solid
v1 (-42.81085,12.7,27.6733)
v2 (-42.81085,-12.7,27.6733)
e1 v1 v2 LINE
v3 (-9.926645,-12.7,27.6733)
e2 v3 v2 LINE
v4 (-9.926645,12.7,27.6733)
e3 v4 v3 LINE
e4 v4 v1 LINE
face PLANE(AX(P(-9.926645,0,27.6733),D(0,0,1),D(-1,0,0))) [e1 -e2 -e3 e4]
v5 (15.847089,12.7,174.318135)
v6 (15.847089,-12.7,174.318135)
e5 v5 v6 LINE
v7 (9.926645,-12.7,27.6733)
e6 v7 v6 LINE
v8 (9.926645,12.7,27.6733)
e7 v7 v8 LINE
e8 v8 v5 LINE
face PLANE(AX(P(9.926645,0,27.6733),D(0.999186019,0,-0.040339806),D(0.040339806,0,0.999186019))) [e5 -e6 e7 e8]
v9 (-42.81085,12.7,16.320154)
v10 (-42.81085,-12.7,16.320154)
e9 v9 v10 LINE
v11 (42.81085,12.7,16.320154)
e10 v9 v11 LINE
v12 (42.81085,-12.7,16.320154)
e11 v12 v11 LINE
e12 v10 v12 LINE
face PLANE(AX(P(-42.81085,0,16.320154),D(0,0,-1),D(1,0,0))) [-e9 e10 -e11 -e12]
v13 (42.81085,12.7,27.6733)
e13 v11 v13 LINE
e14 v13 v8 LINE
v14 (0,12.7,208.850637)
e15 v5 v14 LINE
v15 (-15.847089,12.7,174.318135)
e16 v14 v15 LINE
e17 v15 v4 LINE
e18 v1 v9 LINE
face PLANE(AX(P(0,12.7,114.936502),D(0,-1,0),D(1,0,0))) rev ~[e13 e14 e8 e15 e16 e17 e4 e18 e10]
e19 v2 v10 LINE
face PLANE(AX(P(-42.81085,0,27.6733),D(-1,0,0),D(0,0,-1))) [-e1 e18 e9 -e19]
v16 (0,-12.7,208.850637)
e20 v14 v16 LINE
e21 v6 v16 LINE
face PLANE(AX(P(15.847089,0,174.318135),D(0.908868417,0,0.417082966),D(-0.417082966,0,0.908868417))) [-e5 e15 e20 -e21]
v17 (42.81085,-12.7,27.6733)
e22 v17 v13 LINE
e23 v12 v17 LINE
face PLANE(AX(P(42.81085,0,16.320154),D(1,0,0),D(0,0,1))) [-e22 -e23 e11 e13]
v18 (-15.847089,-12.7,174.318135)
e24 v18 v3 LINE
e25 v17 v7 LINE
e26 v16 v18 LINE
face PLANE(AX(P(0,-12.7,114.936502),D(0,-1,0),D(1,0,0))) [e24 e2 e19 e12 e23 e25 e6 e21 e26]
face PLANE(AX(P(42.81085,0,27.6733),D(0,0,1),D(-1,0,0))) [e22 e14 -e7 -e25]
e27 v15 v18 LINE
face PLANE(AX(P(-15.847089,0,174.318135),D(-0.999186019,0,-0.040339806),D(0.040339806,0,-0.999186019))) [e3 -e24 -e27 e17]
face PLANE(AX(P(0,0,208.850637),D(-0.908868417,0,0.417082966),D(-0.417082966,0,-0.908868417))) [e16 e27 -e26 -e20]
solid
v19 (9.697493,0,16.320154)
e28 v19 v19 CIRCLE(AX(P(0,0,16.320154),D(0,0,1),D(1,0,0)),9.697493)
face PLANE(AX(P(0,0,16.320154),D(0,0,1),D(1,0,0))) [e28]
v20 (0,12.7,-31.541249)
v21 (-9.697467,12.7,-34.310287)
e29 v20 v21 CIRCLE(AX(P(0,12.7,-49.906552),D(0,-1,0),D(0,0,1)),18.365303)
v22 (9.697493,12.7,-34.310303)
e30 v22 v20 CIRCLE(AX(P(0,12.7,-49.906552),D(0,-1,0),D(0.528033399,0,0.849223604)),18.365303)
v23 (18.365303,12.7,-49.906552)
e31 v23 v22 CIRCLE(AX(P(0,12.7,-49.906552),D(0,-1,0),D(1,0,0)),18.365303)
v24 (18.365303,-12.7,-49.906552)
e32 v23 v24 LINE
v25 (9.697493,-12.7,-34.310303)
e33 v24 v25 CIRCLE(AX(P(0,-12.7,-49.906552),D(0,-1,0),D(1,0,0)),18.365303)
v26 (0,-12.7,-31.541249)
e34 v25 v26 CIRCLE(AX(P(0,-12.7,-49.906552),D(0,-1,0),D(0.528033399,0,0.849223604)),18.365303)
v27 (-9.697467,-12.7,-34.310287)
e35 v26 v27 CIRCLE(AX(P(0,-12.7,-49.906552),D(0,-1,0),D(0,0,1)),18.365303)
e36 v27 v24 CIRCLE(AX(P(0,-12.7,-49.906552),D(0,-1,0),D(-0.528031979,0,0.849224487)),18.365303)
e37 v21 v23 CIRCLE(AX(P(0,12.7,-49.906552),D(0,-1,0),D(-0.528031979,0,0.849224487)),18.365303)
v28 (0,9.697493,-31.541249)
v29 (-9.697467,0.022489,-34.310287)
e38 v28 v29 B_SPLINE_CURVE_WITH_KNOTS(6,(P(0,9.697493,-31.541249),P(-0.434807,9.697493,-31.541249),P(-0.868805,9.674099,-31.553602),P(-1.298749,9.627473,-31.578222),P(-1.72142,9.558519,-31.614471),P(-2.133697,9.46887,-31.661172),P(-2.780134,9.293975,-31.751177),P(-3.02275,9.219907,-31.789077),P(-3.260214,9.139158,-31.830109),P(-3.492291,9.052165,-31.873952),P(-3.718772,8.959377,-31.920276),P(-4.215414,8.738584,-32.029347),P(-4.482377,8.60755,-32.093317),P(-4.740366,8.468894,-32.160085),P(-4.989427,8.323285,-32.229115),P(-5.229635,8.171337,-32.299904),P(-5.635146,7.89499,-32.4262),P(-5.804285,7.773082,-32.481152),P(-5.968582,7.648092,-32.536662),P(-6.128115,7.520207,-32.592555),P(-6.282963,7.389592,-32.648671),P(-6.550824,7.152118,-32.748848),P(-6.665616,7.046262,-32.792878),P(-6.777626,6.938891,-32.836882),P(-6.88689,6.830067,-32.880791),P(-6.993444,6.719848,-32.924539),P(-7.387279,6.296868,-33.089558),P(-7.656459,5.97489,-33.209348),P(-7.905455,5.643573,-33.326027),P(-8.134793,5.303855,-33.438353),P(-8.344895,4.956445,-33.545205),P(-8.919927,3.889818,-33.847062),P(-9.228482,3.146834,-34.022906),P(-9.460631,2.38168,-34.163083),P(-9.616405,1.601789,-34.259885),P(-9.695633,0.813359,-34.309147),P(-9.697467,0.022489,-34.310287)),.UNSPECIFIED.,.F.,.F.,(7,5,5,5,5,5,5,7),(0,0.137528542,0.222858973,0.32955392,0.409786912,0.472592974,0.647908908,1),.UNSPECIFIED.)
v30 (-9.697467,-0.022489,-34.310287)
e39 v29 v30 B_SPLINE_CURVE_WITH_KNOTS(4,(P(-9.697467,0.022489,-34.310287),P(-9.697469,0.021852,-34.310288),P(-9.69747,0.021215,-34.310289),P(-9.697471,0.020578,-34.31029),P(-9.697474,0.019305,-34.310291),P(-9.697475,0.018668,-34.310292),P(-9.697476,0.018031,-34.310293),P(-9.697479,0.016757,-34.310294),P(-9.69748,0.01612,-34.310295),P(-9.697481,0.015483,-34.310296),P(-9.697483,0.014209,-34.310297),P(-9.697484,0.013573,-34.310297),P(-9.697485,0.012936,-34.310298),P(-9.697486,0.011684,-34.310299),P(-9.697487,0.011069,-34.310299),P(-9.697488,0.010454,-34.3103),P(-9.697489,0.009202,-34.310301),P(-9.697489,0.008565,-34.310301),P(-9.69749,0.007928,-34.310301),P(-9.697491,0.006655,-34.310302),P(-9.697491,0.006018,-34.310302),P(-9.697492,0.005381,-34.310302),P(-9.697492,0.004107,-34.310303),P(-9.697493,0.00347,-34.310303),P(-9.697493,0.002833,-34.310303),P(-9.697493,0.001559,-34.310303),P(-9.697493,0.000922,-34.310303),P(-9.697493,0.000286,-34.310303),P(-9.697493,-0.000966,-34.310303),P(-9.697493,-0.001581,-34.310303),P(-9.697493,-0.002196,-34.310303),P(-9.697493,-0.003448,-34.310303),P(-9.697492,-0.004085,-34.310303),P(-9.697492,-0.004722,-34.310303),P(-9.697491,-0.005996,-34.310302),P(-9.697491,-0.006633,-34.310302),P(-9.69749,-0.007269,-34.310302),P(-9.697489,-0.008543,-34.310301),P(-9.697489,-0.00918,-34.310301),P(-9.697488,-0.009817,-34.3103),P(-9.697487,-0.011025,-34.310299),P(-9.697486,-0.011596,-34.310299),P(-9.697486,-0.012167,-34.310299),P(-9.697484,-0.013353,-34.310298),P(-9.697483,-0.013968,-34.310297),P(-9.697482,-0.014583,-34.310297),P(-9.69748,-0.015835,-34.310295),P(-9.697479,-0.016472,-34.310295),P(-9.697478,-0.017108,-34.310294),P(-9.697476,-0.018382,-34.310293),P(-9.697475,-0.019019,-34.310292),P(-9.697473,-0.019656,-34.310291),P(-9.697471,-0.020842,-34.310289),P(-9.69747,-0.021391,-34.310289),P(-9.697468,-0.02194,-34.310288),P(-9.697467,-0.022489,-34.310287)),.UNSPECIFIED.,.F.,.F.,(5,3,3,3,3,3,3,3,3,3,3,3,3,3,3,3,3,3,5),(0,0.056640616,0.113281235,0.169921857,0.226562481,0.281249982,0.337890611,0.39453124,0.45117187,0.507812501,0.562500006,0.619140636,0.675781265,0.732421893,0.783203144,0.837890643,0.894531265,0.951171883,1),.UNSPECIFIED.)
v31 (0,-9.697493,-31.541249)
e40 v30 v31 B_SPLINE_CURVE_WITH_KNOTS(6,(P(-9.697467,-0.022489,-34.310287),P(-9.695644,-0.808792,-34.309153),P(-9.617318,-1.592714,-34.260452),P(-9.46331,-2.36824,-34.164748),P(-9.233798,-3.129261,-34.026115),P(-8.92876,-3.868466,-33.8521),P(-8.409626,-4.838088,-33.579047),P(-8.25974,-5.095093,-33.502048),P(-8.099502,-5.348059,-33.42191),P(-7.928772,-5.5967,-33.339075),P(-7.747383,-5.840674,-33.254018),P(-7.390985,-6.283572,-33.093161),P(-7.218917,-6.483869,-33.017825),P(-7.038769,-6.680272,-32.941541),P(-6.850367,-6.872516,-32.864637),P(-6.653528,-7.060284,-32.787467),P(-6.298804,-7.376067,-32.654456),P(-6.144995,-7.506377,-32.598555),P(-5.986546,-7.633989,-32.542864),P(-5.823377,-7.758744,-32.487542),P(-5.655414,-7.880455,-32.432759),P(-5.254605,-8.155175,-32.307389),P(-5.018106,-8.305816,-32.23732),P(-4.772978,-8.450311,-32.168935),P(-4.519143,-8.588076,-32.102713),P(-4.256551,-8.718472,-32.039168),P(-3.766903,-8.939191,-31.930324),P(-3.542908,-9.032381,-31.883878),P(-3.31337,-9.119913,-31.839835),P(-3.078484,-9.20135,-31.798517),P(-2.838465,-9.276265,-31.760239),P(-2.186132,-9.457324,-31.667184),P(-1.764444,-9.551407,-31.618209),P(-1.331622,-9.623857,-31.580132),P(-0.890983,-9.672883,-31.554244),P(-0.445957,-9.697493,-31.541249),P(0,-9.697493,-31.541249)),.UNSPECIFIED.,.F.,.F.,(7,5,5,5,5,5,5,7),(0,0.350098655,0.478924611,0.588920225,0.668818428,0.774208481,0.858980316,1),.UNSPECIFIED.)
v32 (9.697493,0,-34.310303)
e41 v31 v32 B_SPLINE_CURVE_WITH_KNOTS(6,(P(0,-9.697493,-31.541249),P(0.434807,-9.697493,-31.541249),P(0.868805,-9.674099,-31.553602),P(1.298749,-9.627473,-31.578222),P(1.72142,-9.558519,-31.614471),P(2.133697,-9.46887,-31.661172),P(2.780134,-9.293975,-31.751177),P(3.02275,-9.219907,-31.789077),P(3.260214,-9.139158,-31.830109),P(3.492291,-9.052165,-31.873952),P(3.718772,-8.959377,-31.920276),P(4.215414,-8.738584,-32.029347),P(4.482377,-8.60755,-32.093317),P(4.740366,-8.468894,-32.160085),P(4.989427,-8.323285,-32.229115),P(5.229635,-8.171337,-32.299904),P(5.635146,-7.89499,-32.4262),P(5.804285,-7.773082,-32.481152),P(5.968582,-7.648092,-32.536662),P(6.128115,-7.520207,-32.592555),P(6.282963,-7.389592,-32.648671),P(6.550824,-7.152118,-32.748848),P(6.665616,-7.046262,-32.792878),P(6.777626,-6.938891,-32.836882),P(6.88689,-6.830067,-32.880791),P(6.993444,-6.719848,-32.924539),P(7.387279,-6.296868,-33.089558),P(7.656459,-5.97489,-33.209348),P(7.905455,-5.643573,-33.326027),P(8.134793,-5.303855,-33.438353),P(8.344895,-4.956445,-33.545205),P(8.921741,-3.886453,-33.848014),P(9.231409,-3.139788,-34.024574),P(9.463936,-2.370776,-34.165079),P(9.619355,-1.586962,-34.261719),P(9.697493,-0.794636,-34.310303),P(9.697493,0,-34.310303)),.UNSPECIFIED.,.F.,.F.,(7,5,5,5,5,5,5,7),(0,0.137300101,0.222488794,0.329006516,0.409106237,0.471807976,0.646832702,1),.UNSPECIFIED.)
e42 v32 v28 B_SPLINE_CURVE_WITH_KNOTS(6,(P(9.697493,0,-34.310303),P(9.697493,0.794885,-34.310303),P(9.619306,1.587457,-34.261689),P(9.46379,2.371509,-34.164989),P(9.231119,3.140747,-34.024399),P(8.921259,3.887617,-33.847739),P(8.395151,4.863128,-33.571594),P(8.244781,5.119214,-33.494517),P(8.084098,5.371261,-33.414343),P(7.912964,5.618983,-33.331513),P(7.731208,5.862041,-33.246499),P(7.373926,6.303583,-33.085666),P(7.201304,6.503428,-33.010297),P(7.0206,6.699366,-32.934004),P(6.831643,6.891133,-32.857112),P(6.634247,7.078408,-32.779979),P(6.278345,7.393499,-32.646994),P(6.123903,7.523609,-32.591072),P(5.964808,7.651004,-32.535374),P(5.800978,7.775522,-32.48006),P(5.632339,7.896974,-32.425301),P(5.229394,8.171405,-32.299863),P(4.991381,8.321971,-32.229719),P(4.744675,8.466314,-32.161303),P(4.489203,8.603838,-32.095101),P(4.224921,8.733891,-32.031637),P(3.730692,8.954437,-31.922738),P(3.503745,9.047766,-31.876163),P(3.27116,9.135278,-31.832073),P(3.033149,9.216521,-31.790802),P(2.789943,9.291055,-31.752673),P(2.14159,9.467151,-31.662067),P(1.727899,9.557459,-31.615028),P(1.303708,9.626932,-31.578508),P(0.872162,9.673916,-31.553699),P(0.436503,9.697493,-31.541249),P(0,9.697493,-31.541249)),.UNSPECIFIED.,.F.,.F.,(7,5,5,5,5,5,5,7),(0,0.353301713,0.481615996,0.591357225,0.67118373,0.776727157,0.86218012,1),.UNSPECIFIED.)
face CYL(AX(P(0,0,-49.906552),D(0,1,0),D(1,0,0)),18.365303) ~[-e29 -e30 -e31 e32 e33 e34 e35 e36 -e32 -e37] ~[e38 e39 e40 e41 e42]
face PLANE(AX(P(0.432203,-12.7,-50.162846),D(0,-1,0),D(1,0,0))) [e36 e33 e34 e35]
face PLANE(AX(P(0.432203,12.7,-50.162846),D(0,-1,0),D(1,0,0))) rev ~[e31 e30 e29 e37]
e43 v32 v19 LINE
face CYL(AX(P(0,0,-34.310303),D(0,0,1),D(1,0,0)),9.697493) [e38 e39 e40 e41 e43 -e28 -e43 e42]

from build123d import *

# Parameters (mm, degrees)
F0_W     = 9.6974931657
F0_H     = 5.6765731424
F0_W_2   = 9.6974670887
F1_DEPTH = 12.7
F3_DEPTH = 12.7


# Not quite as in the source:
# - ends of sketch curves that miss each other by under 0.0002 mm in the source are joined


with BuildPart() as f1:
    # F0 (on Front) → F1 (new body, symmetric)
    with BuildSketch(Plane.XZ):
        Polygon((-9.9266454939, 27.6733003557), (9.9266454939, 27.6733003557), (15.8470887691, 174.3181347847), (0, 208.8506370783), (-15.8470887691, 174.3181347847), align=None)
        Polygon((9.6974931657, 21.9967272133), (9.6974931657, 16.3201540709), (42.8108498454, 16.3201540709), (42.8108498454, 27.6733003557), (9.9266454939, 27.6733003557), align=None)
        Polygon((-42.8108498454, 16.3201540709), (-9.6974670887, 16.3201540709), (-9.6974670887, 21.9967272133), (-9.9266454939, 27.6733003557), (-42.8108498454, 27.6733003557), align=None)
        Polygon((0, 21.9967272133), (9.6974931657, 21.9967272133), (9.9266454939, 27.6733003557), (-9.9266454939, 27.6733003557), (-9.6974670887, 21.9967272133), align=None)
        with Locations((4.8487465829, 19.1584406421)):
            Rectangle(F0_W, F0_H)
        with Locations((-4.8487335443, 19.1584406421)):
            Rectangle(F0_W_2, F0_H)
    extrude(amount=F1_DEPTH, both=True)


with BuildPart() as f2:
    # F0 (on Front) → F2 (revolve)
    with BuildSketch(Plane.XZ):
        with BuildLine():
            ThreePointArc((0, -31.5412492268), (5.0425448571, -32.2470761559), (9.6974931657, -34.3103033691))
            Line((9.6974931657, -34.3103033691), (9.6974931657, 16.3201540709))
            Line((9.6974931657, 16.3201540709), (0, 16.3201540709))
            Line((0, 16.3201540709), (0, -31.5412492268))
        make_face()
    revolve(axis=Axis((0, 0, -14.901005663), (0, 0, 1)))

    # F0 (on Front) → F3 (join, symmetric)
    with BuildSketch(Plane.XZ):
        with BuildLine():
            ThreePointArc((-9.6974670887, -34.3102871549), (-8.9215307642, -65.9592970493), (18.3653026112, -49.9065518379))
            ThreePointArc((18.3653026112, -49.9065518379), (16.0527526698, -40.9850344938), (9.6974931657, -34.3103033691))
            Line((9.6974931657, -34.3103033691), (9.6974931657, -51.7987385392))
            Line((9.6974931657, -51.7987385392), (0, -51.7987385392))
            Line((0, -51.7987385392), (-9.6974670887, -51.7987385392))
            Line((-9.6974670887, -51.7987385392), (-9.6974670887, -34.3102871549))
        make_face()
        with BuildLine():
            ThreePointArc((0, -31.5412492268), (-5.0425300937, -32.2470719403), (-9.6974670887, -34.3102871549))
            Line((-9.6974670887, -34.3102871549), (-9.6974670887, -51.7987385392))
            Line((-9.6974670887, -51.7987385392), (0, -51.7987385392))
            Line((0, -51.7987385392), (0, -49.9065518379))
            Line((0, -49.9065518379), (0, -31.5412492268))
        make_face()
        with BuildLine():
            Line((9.6974931657, -51.7987385392), (9.6974931657, -34.3103033691))
            ThreePointArc((9.6974931657, -34.3103033691), (5.0425448571, -32.2470761559), (0, -31.5412492268))
            Line((0, -31.5412492268), (0, -49.9065518379))
            Line((0, -49.9065518379), (0, -51.7987385392))
            Line((0, -51.7987385392), (9.6974931657, -51.7987385392))
        make_face()
    extrude(amount=F3_DEPTH, both=True)


solid = Compound([f1.part, f2.part])
